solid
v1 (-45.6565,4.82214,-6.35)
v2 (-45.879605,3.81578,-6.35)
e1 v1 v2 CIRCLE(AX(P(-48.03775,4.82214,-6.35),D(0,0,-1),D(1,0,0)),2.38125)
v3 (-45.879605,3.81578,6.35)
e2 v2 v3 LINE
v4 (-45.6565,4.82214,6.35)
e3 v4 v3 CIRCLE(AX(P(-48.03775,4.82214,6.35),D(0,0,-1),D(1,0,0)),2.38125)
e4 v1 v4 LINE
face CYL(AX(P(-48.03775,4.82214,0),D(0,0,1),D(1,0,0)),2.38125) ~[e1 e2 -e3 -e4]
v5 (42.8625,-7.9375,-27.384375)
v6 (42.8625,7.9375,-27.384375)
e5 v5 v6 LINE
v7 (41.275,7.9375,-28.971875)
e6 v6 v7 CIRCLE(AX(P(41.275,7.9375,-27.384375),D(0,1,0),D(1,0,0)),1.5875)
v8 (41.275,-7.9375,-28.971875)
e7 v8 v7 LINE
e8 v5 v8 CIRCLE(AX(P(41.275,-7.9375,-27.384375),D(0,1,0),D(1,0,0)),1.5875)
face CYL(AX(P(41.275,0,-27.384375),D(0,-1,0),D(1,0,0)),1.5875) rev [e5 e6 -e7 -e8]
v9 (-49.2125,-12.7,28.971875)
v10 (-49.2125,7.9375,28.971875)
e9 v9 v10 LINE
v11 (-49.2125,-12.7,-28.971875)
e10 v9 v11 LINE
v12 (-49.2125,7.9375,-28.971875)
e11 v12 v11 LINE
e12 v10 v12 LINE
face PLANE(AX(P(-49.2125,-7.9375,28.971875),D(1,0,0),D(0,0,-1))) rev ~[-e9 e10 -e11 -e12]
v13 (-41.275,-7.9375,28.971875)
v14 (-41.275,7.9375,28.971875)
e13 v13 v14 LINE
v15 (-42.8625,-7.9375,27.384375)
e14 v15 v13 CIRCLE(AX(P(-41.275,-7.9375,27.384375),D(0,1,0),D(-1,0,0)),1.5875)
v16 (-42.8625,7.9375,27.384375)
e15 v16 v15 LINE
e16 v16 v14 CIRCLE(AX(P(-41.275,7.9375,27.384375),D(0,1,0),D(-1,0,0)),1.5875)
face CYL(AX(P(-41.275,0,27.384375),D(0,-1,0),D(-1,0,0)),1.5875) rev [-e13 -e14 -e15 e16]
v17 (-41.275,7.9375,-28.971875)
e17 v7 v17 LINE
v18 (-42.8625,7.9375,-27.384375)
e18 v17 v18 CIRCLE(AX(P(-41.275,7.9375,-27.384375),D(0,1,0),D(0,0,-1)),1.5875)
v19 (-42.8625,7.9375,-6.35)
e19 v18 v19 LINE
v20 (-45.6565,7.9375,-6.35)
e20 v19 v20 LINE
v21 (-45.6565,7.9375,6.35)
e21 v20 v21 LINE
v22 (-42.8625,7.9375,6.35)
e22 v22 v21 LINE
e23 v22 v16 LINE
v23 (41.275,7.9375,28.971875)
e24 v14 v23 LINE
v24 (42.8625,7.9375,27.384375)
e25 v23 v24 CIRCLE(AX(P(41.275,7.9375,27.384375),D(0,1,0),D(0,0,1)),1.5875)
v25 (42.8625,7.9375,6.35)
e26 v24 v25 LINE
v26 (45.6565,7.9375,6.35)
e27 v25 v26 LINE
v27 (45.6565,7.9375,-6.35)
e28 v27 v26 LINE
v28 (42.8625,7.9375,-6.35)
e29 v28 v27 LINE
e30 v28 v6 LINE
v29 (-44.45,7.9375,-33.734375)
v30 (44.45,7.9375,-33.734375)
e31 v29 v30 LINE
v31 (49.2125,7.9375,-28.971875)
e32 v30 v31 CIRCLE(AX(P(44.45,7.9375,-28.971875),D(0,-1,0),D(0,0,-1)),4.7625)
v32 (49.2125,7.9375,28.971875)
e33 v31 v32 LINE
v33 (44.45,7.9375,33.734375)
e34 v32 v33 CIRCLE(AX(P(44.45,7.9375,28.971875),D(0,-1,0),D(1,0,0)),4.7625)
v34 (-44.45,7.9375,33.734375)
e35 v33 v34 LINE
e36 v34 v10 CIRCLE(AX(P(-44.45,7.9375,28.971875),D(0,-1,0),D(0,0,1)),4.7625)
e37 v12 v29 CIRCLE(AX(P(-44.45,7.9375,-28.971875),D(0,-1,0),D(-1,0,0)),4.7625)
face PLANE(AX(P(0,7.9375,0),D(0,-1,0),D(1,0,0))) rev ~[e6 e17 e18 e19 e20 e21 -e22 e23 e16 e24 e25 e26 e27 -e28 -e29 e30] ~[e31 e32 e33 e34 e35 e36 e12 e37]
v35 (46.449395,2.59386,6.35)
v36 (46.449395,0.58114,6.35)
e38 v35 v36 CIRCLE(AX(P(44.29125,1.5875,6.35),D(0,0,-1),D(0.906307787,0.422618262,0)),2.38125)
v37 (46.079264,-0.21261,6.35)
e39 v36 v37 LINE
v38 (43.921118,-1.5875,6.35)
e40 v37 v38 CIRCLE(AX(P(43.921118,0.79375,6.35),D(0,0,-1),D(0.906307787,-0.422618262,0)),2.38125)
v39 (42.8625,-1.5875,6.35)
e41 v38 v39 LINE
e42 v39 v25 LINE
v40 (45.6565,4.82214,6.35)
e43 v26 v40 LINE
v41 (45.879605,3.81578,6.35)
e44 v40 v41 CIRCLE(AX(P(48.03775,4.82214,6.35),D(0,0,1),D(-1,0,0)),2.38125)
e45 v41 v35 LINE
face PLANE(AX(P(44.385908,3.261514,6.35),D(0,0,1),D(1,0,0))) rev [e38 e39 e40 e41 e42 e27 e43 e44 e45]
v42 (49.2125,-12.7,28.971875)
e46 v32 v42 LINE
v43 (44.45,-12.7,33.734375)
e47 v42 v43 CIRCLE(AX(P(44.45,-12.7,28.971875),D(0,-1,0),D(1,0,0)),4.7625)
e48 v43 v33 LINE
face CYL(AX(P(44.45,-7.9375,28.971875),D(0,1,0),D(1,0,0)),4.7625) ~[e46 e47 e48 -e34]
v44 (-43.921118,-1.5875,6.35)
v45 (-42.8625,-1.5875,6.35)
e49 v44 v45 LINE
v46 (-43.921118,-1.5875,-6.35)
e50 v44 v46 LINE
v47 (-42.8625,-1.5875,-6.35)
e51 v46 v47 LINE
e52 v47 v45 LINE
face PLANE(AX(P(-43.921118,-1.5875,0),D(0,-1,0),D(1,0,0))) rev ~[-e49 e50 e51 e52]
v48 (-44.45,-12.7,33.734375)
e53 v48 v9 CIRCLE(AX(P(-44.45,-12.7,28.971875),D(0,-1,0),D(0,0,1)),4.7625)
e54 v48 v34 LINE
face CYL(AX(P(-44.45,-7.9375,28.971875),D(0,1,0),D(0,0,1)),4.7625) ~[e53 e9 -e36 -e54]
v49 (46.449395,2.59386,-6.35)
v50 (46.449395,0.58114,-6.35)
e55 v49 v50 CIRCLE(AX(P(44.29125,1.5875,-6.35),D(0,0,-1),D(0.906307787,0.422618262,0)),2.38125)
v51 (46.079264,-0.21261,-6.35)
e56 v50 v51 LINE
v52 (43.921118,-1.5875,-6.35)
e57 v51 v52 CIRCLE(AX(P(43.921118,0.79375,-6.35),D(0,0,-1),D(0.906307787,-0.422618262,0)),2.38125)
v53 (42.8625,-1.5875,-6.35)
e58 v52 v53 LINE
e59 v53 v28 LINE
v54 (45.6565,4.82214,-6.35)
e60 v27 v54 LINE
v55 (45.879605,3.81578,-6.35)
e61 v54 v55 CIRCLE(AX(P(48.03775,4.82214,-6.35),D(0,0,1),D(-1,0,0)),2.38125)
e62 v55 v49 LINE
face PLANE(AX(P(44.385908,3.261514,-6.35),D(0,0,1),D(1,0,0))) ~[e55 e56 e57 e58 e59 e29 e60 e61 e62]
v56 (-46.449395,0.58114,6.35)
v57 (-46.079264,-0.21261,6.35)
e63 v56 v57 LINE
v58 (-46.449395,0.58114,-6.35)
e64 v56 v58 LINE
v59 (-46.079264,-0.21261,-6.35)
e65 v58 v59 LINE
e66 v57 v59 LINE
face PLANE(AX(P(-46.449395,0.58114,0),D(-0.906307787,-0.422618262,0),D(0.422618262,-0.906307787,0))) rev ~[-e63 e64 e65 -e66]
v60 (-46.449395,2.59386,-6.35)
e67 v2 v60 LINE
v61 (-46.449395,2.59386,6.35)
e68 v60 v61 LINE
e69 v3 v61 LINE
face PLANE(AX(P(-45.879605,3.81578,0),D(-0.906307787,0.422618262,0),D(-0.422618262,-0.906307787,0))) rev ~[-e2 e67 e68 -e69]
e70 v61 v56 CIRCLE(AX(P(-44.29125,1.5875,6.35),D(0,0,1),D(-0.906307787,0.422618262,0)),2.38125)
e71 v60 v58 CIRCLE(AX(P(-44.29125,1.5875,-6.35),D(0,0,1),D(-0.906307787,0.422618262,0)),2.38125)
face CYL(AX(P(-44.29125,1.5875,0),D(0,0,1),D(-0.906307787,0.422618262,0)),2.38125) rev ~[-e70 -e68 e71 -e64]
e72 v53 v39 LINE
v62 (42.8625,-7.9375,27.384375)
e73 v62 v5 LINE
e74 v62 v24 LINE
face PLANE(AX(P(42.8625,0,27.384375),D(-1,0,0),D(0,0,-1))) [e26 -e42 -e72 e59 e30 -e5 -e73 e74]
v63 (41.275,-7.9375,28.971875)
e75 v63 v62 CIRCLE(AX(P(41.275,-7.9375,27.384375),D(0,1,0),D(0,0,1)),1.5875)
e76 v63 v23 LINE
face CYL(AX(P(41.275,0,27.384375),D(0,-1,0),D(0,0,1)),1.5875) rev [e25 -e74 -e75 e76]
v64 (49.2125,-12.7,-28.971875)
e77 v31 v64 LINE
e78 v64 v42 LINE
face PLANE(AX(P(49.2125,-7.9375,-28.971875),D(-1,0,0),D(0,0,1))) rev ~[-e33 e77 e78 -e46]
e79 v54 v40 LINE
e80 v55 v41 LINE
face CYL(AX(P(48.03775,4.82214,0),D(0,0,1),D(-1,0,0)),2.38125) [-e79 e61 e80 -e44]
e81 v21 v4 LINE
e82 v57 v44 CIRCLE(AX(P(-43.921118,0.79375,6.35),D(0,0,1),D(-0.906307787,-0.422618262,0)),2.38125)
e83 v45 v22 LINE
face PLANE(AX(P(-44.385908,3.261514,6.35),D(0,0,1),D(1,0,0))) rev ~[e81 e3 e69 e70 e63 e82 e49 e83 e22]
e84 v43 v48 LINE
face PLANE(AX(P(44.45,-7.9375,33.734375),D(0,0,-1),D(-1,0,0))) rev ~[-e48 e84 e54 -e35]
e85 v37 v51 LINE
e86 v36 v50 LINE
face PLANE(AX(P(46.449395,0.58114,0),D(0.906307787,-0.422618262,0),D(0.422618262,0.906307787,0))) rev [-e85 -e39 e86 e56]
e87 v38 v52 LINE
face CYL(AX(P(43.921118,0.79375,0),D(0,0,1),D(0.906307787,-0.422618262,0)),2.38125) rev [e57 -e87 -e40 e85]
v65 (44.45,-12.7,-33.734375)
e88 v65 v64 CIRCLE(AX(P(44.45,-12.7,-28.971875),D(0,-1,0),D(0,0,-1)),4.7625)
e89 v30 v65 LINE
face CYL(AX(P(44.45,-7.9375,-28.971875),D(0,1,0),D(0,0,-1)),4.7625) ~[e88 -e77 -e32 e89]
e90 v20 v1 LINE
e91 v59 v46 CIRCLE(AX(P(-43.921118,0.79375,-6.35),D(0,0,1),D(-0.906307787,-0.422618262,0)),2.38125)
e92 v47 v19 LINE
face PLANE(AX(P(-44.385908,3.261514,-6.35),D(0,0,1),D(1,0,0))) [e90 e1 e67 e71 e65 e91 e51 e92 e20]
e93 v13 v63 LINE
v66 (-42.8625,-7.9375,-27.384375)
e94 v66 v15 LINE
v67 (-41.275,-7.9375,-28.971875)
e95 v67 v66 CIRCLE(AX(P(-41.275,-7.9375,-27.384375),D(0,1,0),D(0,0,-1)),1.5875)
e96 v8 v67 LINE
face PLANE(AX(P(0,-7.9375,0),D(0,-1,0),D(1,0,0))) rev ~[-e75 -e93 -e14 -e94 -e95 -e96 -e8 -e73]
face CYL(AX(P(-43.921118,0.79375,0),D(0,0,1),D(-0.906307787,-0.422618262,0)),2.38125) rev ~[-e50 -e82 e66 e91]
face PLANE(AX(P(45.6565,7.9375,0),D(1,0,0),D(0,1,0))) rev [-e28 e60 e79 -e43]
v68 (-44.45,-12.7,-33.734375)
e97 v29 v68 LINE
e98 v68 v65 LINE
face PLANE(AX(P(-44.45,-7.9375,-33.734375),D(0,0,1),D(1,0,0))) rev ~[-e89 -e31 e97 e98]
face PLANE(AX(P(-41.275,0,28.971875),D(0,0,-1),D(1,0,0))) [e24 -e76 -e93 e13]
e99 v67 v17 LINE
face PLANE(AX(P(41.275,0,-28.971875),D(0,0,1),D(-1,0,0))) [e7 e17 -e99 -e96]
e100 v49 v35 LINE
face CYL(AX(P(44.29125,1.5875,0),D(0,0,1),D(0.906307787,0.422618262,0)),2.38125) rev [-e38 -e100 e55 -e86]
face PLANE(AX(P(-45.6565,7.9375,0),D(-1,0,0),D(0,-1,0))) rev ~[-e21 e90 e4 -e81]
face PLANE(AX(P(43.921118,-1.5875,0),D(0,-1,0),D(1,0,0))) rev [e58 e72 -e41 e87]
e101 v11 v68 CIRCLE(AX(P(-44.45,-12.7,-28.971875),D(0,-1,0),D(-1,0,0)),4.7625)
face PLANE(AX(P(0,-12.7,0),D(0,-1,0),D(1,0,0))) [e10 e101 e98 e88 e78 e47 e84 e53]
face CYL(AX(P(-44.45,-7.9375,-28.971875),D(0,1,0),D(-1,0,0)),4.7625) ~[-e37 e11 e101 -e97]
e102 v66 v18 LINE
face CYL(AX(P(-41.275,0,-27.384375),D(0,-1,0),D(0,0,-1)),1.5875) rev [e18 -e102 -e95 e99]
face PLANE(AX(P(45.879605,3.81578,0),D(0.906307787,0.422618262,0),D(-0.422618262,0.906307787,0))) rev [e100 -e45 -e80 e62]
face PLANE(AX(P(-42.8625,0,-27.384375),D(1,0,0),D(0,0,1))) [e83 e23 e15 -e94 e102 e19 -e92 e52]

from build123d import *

# Parameters (mm, degrees)
F1_DEPTH = 7.9375
F3_DEPTH = 4.7625
F5_DEPTH = 6.35


# Not quite as in the source:
# - a pattern or mirror of a feature is missing from the dataset's text; its kind, count and spacing are read off the source's solid


with BuildPart() as f1:
    # F0 (on Front) → F1 (new body, symmetric)
    with BuildSketch(Plane.XZ):
        with BuildLine():
            Line((44.45, 33.734375), (-44.45, 33.734375))
            ThreePointArc((-44.45, 33.734375), (-47.8175960454, 32.3394710454), (-49.2125, 28.971875))
            Line((-49.2125, 28.971875), (-49.2125, -28.971875))
            ThreePointArc((-49.2125, -28.971875), (-47.8175960454, -32.3394710454), (-44.45, -33.734375))
            Line((-44.45, -33.734375), (44.45, -33.734375))
            ThreePointArc((44.45, -33.734375), (47.8175960454, -32.3394710454), (49.2125, -28.971875))
            Line((49.2125, -28.971875), (49.2125, 28.971875))
            ThreePointArc((49.2125, 28.971875), (47.8175960454, 32.3394710454), (44.45, 33.734375))
        make_face()
        with BuildLine():
            ThreePointArc((-42.8625, 27.384375), (-42.3975320151, 28.5069070151), (-41.275, 28.971875))
            Line((-41.275, 28.971875), (41.275, 28.971875))
            ThreePointArc((41.275, 28.971875), (42.3975320151, 28.5069070151), (42.8625, 27.384375))
            Line((42.8625, 27.384375), (42.8625, -27.384375))
            ThreePointArc((42.8625, -27.384375), (42.3975320151, -28.5069070151), (41.275, -28.971875))
            Line((41.275, -28.971875), (-41.275, -28.971875))
            ThreePointArc((-41.275, -28.971875), (-42.3975320151, -28.5069070151), (-42.8625, -27.384375))
            Line((-42.8625, -27.384375), (-42.8625, 27.384375))
        make_face(mode=Mode.SUBTRACT)
    extrude(amount=F1_DEPTH, both=True)

    # F2 (on face) → F3 (join)
    with BuildSketch(Plane.XZ.offset(7.9375)):
        with BuildLine():
            Line((-49.2125, 28.971875), (-49.2125, -28.971875))
            ThreePointArc((-49.2125, -28.971875), (-47.8175960454, -32.3394710454), (-44.45, -33.734375))
            Line((-44.45, -33.734375), (44.45, -33.734375))
            ThreePointArc((44.45, -33.734375), (47.8175960454, -32.3394710454), (49.2125, -28.971875))
            Line((49.2125, -28.971875), (49.2125, 28.971875))
            ThreePointArc((49.2125, 28.971875), (47.8175960454, 32.3394710454), (44.45, 33.734375))
            Line((44.45, 33.734375), (-44.45, 33.734375))
            ThreePointArc((-44.45, 33.734375), (-47.8175960454, 32.3394710454), (-49.2125, 28.971875))
        make_face()
        with BuildLine():
            Line((41.275, -28.971875), (-41.275, -28.971875))
            ThreePointArc((-41.275, -28.971875), (-42.3975320151, -28.5069070151), (-42.8625, -27.384375))
            Line((-42.8625, -27.384375), (-42.8625, 27.384375))
            ThreePointArc((-42.8625, 27.384375), (-42.3975320151, 28.5069070151), (-41.275, 28.971875))
            Line((-41.275, 28.971875), (41.275, 28.971875))
            ThreePointArc((41.275, 28.971875), (42.3975320151, 28.5069070151), (42.8625, 27.384375))
            Line((42.8625, 27.384375), (42.8625, -27.384375))
            ThreePointArc((42.8625, -27.384375), (42.3975320151, -28.5069070151), (41.275, -28.971875))
        make_face(mode=Mode.SUBTRACT)
        with BuildLine():
            ThreePointArc((-42.8625, -27.384375), (-42.3975320151, -28.5069070151), (-41.275, -28.971875))
            Line((-41.275, -28.971875), (41.275, -28.971875))
            ThreePointArc((41.275, -28.971875), (42.3975320151, -28.5069070151), (42.8625, -27.384375))
            Line((42.8625, -27.384375), (42.8625, 27.384375))
            ThreePointArc((42.8625, 27.384375), (42.3975320151, 28.5069070151), (41.275, 28.971875))
            Line((41.275, 28.971875), (-41.275, 28.971875))
            ThreePointArc((-41.275, 28.971875), (-42.3975320151, 28.5069070151), (-42.8625, 27.384375))
            Line((-42.8625, 27.384375), (-42.8625, -27.384375))
        make_face()
    extrude(amount=F3_DEPTH)

    # F4 (on Top) → F5 (cut, symmetric)
    with BuildSketch(Plane.XY):
        with BuildLine():
            Line((-43.9211182963, -1.5875), (-42.8625, -1.5875))
            Line((-42.8625, -1.5875), (-42.8625, 1.5875))
            Line((-42.8625, 1.5875), (-42.8625, 7.9375))
            Line((-42.8625, 7.9375), (-45.6565, 7.9375))
            Line((-45.6565, 7.9375), (-45.6565, 4.8221398621))
            ThreePointArc((-45.6565, 4.8221398621), (-45.712945133, 4.3067430314), (-45.8796045821, 3.8157801263))
            Line((-45.8796045821, 3.8157801263), (-46.4493954179, 2.5938597358))
            ThreePointArc((-46.4493954179, 2.5938597358), (-46.6725, 1.5875), (-46.4493954179, 0.5811402642))
            Line((-46.4493954179, 0.5811402642), (-46.0792637142, -0.2126097358))
            ThreePointArc((-46.0792637142, -0.2126097358), (-45.2005629887, -1.2145758803), (-43.9211182963, -1.5875))
        make_face()
    f5 = extrude(amount=F5_DEPTH, both=True, mode=Mode.SUBTRACT)

    # F5_copies: F5 across plane
    add(f5.mirror(Plane(origin=(0, 0, 0), x_dir=(0, 0, 1), z_dir=(1, 0, 0))), mode=Mode.SUBTRACT)


solid = f1.part
